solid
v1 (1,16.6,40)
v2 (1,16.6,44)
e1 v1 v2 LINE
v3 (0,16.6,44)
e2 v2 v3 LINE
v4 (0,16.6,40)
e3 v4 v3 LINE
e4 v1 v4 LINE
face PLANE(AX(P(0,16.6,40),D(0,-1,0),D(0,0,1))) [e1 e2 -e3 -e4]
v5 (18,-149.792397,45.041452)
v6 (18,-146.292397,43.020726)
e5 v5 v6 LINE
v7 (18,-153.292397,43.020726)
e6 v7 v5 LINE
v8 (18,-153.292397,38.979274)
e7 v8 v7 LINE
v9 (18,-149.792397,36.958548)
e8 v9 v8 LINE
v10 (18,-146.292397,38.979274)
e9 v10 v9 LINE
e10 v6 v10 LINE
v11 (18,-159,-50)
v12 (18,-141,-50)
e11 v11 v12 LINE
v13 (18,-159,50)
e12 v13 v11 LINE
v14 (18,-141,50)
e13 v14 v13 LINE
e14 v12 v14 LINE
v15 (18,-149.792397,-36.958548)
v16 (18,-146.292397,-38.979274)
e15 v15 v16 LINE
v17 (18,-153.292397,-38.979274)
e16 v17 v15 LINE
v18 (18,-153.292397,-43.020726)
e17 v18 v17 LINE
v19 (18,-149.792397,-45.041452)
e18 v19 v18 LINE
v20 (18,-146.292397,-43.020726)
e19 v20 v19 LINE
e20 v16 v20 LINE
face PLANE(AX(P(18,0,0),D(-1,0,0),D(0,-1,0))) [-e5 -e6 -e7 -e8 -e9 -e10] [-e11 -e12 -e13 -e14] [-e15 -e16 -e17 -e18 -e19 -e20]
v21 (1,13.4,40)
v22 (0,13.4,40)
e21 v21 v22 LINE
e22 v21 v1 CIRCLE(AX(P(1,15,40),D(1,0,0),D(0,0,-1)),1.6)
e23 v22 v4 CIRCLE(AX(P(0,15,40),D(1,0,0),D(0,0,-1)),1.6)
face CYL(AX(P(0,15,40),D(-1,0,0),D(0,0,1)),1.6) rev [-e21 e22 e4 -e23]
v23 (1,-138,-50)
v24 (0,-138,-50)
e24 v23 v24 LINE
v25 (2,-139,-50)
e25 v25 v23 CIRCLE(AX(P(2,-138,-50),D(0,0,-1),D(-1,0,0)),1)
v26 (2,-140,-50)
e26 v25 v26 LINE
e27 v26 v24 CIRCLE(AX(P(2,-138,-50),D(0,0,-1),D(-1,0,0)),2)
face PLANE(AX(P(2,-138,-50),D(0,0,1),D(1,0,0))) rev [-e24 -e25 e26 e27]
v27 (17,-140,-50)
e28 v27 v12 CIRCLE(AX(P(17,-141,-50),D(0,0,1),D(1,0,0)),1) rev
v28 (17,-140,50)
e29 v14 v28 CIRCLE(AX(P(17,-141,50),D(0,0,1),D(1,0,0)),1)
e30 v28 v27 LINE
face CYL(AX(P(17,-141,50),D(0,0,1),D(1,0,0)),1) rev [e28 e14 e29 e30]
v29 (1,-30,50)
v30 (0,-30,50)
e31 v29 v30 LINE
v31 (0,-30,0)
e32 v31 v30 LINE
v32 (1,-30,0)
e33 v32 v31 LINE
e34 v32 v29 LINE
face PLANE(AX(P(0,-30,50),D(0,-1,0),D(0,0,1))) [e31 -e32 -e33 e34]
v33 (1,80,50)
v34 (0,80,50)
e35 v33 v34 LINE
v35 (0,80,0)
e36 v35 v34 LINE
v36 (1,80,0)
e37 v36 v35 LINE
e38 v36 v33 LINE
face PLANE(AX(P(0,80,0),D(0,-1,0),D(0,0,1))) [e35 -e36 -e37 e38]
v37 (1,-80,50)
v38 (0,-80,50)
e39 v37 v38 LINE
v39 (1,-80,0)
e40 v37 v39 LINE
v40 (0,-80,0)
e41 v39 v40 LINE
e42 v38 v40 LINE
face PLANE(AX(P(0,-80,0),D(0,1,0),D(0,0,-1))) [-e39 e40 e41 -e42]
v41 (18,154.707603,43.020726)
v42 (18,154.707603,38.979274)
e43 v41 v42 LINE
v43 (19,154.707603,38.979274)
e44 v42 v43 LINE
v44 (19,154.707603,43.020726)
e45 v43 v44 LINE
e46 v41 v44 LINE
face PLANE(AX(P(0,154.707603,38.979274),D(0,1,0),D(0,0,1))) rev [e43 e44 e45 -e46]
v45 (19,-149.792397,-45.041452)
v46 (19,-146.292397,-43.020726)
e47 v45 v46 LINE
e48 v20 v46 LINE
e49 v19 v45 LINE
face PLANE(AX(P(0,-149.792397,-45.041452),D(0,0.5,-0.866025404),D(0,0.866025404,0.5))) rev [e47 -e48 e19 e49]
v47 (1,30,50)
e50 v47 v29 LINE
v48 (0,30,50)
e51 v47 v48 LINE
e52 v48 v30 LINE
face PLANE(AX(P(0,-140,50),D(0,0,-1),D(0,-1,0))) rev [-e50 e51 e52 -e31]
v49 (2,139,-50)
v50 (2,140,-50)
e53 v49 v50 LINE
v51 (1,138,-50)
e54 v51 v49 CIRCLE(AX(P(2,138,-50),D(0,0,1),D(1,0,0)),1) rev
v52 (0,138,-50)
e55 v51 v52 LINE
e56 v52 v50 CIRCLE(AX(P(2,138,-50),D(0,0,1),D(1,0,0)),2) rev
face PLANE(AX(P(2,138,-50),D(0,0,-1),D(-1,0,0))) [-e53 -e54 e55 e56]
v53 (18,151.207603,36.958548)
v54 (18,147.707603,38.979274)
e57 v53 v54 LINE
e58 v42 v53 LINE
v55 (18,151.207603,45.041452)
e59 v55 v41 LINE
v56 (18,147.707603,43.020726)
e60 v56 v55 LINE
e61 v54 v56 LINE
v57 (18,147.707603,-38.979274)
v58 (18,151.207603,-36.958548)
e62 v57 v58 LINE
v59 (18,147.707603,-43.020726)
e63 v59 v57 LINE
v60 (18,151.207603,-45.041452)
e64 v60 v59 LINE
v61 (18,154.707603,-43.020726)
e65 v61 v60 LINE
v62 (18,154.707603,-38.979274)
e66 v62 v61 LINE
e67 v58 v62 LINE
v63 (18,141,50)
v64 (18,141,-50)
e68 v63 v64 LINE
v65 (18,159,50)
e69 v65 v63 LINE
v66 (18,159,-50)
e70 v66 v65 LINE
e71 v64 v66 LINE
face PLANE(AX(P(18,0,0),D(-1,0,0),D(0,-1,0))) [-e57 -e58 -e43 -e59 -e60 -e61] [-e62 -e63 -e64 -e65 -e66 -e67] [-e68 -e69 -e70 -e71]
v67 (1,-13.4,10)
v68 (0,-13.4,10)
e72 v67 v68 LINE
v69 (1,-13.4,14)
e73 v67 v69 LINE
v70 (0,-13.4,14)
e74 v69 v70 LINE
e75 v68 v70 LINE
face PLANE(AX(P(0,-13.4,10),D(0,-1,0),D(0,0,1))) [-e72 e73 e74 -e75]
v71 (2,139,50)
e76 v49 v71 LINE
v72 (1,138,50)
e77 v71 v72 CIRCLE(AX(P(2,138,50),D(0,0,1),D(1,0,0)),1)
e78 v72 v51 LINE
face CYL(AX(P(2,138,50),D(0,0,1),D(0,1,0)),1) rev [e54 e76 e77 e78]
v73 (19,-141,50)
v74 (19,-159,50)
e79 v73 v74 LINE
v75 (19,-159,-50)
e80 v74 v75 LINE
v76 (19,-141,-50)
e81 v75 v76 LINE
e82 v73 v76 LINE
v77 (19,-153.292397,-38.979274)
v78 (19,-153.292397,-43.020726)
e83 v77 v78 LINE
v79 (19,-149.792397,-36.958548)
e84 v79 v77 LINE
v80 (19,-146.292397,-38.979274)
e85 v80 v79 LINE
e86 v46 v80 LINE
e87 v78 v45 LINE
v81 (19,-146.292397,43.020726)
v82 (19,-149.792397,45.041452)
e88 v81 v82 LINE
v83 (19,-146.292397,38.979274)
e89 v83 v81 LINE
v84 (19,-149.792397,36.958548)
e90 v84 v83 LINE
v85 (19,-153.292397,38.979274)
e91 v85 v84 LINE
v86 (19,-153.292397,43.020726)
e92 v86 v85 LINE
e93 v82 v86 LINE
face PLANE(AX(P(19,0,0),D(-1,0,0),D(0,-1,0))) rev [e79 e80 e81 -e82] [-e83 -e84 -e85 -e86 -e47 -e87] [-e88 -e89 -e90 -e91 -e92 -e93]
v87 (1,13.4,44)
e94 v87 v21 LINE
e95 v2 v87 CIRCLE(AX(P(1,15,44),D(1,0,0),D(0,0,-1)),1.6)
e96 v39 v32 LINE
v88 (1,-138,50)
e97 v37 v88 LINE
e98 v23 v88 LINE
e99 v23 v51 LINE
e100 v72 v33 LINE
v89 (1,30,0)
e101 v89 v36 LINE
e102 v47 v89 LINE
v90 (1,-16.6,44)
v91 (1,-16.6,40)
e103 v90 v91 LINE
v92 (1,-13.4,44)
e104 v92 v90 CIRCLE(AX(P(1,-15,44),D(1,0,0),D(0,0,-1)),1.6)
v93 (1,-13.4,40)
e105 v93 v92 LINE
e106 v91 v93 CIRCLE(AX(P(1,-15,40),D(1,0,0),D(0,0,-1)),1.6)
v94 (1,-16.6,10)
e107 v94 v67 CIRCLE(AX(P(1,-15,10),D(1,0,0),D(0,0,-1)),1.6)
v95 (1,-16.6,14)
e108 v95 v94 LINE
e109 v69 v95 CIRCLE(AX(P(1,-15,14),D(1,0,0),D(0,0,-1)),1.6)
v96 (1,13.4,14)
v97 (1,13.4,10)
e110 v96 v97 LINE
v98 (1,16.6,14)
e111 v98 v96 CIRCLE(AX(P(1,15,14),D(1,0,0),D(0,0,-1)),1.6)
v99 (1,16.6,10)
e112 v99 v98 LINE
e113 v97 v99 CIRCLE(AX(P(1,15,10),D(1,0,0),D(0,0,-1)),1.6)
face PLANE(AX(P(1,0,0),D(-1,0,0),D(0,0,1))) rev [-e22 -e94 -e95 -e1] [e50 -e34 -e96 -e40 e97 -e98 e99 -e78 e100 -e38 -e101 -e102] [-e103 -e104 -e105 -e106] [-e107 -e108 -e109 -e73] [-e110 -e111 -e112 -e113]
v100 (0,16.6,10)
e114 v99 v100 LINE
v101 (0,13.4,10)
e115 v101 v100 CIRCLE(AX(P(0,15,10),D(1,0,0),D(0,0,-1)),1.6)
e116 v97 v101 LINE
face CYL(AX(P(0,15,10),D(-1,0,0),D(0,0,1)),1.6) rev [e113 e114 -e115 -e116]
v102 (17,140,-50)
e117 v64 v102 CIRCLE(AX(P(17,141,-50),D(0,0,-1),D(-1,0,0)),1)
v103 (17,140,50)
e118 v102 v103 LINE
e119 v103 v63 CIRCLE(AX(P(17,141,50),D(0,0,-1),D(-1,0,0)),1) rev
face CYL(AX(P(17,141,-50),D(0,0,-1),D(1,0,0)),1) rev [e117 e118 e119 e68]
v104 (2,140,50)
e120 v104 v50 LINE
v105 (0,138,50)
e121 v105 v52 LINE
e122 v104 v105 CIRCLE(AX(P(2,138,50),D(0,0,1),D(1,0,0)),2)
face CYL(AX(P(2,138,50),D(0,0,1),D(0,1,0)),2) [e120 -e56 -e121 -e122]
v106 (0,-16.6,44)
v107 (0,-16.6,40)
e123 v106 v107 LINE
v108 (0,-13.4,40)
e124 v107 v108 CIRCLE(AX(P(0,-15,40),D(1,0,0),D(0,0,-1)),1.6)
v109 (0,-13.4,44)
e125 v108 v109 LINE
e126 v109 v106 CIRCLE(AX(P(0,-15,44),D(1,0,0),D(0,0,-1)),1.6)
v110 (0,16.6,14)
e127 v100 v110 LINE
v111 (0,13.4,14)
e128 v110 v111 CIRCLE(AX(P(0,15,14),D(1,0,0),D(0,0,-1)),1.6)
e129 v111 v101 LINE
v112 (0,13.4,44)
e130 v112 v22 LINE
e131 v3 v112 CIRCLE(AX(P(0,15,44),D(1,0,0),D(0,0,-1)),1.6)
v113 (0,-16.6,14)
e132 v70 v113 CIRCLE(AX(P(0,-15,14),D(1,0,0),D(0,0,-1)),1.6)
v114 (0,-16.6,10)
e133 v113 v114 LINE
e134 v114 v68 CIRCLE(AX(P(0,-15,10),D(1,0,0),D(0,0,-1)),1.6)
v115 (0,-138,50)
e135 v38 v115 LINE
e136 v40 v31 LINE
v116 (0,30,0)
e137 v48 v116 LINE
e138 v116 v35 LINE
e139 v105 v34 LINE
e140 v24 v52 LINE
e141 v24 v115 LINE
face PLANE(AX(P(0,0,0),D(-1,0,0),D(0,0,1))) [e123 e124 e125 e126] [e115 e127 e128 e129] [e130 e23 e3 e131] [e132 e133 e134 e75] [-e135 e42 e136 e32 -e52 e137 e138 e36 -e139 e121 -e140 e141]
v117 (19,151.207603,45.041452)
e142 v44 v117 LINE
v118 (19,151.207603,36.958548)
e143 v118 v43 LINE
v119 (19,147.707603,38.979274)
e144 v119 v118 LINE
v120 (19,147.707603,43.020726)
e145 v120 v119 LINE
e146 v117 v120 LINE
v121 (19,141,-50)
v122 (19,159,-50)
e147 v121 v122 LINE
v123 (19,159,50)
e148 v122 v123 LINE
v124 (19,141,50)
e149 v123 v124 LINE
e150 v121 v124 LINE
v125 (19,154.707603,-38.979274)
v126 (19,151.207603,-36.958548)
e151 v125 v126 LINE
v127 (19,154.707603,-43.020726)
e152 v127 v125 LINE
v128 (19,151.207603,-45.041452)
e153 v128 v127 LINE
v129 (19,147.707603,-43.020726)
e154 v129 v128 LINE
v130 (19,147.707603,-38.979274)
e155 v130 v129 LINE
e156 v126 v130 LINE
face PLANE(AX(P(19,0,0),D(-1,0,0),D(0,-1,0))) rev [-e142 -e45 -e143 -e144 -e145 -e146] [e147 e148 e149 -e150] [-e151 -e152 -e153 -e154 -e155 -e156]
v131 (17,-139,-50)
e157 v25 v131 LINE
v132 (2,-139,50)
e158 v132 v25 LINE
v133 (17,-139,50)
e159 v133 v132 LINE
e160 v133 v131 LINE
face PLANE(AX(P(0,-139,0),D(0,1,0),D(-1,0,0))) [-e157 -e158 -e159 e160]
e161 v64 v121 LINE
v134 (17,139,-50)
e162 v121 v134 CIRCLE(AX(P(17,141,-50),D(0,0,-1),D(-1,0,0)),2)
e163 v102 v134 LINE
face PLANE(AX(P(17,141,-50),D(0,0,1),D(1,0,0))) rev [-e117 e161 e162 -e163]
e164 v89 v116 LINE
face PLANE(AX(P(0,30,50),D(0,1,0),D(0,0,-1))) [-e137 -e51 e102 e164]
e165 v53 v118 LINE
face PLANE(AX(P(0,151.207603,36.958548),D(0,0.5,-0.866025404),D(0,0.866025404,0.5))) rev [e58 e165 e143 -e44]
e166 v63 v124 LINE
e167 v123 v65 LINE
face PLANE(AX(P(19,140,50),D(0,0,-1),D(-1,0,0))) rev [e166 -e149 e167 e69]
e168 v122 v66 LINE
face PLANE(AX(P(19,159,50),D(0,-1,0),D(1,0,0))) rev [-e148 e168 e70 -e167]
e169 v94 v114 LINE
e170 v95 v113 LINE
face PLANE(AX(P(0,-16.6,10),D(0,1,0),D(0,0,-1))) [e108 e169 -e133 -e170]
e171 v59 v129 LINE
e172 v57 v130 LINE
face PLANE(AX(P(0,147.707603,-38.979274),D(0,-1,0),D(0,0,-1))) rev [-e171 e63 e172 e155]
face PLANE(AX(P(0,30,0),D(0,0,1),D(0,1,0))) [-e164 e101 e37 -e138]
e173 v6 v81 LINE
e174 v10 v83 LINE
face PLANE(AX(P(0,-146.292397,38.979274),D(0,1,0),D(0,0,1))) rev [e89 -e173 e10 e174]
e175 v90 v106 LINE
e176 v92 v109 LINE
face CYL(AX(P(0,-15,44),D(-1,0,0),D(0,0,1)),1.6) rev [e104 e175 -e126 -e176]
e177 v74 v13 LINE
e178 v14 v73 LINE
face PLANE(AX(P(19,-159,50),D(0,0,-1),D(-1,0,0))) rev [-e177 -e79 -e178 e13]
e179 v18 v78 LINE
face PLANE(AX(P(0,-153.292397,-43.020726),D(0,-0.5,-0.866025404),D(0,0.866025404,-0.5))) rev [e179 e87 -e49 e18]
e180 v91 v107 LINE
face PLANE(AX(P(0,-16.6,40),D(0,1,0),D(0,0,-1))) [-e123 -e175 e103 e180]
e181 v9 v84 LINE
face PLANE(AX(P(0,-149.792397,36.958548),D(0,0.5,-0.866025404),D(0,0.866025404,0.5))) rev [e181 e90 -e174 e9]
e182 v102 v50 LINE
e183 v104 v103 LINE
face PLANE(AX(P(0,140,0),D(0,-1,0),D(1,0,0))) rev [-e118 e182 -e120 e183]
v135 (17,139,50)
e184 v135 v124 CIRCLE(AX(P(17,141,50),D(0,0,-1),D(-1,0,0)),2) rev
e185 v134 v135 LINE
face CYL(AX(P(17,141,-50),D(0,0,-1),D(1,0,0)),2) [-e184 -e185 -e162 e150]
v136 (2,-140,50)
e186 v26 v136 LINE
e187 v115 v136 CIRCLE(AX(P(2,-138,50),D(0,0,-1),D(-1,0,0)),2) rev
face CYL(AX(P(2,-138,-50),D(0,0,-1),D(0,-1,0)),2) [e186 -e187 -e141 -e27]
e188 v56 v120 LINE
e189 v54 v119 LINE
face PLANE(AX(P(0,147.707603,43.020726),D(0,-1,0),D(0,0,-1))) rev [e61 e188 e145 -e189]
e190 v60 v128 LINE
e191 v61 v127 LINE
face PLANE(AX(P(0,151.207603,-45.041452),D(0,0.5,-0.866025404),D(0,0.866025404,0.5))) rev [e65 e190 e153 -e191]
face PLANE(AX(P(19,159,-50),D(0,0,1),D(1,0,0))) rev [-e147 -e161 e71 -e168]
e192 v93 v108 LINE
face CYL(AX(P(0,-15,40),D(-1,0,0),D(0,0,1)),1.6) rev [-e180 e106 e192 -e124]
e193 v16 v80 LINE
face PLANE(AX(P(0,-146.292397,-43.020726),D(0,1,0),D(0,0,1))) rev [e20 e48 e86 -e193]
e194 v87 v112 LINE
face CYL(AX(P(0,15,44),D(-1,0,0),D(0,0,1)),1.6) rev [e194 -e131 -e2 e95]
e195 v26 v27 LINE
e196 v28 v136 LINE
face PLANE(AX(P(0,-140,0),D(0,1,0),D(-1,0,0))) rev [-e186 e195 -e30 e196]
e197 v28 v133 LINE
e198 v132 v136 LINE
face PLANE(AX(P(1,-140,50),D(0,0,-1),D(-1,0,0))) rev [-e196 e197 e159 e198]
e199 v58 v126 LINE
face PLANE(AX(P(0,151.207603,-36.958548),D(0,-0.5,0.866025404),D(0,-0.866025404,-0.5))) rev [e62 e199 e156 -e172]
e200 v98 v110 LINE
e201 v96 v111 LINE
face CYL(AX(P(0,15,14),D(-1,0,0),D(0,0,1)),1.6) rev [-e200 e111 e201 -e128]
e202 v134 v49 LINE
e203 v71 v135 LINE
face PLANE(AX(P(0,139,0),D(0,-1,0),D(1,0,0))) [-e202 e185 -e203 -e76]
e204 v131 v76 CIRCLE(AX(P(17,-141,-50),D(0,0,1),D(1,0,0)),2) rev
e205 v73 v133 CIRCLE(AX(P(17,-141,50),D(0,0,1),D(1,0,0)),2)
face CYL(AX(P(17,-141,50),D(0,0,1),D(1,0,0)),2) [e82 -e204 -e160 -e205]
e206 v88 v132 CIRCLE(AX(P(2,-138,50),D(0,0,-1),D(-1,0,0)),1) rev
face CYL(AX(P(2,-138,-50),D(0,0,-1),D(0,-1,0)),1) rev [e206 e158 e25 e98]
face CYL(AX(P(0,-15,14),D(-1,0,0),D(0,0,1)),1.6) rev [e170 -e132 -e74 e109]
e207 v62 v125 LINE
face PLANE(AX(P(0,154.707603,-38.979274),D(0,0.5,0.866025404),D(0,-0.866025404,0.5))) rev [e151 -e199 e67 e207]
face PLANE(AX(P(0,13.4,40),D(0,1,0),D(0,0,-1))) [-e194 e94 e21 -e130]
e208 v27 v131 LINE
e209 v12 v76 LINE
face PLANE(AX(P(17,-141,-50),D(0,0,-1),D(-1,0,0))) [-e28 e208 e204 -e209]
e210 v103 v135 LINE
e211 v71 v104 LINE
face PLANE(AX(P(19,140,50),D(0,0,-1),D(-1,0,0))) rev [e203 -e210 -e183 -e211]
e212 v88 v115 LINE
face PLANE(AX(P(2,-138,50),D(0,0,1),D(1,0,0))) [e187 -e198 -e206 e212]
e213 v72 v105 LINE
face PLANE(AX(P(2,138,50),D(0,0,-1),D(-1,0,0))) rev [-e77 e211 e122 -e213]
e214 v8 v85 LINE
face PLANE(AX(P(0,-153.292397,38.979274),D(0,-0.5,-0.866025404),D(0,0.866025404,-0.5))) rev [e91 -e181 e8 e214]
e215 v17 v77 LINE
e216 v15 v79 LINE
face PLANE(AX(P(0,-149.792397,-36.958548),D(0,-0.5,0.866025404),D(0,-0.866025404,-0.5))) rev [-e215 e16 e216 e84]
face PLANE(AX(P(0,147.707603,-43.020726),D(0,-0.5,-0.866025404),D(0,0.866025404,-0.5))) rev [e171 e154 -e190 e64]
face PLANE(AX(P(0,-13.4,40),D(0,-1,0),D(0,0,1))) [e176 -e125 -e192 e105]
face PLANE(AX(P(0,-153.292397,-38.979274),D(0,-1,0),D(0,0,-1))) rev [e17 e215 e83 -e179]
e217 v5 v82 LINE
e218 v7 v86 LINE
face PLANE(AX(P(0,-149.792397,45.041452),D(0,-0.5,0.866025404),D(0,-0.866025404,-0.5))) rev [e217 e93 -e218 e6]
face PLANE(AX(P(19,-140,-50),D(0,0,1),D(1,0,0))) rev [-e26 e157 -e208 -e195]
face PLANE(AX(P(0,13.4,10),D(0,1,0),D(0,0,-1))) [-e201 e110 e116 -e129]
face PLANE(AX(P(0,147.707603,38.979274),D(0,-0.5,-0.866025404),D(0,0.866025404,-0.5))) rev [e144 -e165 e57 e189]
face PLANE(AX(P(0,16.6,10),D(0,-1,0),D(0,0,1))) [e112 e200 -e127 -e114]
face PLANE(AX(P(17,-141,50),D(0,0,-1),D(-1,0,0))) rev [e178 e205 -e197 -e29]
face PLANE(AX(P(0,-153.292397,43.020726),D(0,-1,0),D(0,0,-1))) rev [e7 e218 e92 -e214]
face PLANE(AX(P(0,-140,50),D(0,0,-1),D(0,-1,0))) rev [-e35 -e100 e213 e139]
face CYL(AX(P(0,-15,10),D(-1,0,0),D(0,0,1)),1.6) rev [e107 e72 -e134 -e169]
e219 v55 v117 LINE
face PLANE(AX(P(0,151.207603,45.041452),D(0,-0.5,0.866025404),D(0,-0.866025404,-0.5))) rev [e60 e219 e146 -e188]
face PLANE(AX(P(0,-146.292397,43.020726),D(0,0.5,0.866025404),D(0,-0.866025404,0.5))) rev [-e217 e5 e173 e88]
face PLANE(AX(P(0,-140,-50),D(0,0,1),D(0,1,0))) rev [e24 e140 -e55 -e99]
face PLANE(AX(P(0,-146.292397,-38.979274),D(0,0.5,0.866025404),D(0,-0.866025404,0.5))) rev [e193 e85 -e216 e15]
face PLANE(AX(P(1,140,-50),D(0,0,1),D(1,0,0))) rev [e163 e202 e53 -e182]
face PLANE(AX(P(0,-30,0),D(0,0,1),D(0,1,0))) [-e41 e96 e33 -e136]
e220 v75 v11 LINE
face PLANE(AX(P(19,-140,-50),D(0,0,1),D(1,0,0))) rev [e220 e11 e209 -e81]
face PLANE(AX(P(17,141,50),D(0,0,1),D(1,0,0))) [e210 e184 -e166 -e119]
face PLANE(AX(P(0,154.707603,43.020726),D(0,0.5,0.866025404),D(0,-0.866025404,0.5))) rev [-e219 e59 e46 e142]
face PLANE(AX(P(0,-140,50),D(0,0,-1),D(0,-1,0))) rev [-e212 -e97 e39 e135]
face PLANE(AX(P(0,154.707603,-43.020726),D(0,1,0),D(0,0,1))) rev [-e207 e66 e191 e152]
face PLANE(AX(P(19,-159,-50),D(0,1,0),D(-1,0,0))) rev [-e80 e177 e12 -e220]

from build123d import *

# Parameters (mm, degrees)
SKETCH1_W                      = 280
SKETCH1_H                      = 100
BOSS_EXTRUDE1_DEPTH            = 1
SKETCH2_W                      = 50
SKETCH2_H                      = 50
CUT_EXTRUDE3_DEPTH             = 149.664050799
CUT_EXTRUDE4_DEPTH             = 149.664050799
EDGE_FLANGE1_STRIP_W           = 6
EDGE_FLANGE1_STRIP_H           = 1
EDGE_FLANGE1_STRIP_CUT_DEPTH   = 100
EDGE_FLANGE1_STRIP_2_W         = 6
EDGE_FLANGE1_STRIP_2_H         = 1
EDGE_FLANGE1_STRIP_CUT_2_DEPTH = 100
EDGE_FLANGE1_DEPTH             = 100
EDGE_FLANGE1_BEND_DEPTH        = 100
EDGE_FLANGE2_STRIP_W           = 6
EDGE_FLANGE2_STRIP_H           = 1
EDGE_FLANGE2_STRIP_CUT_DEPTH   = 100
EDGE_FLANGE2_STRIP_2_W         = 6
EDGE_FLANGE2_STRIP_2_H         = 1
EDGE_FLANGE2_STRIP_CUT_2_DEPTH = 100
EDGE_FLANGE2_DEPTH             = 100
EDGE_FLANGE2_BEND_DEPTH        = 100
CUT_EXTRUDE5_DEPTH             = 168.755774863


# Sheet-metal steps are written as plain solids
with BuildPart() as part:
    # Sketch1 → Boss-Extrude1 (new body)
    with BuildSketch(Plane.YZ):
        Rectangle(SKETCH1_W, SKETCH1_H)
    extrude(amount=BOSS_EXTRUDE1_DEPTH)

    # Sketch2 → Cut-Extrude3 (cut, through all)
    with BuildSketch(Plane.YZ.offset(1)):
        with Locations((-55, 25)):
            Rectangle(SKETCH2_W, SKETCH2_H)
        with Locations((55, 25)):
            Rectangle(SKETCH2_W, SKETCH2_H)
    extrude(amount=-CUT_EXTRUDE3_DEPTH, mode=Mode.SUBTRACT)

    # Sketch3 → Cut-Extrude4 (cut, through all)
    with BuildSketch(Plane.YZ.offset(1)):
        with BuildLine():
            Line((-16.6, 40), (-16.6, 44))
            ThreePointArc((-16.6, 44), (-15, 45.6), (-13.4, 44))
            Line((-13.4, 44), (-13.4, 40))
            ThreePointArc((-13.4, 40), (-15, 38.4), (-16.6, 40))
        make_face()
        with BuildLine():
            Line((13.4, 40), (13.4, 44))
            ThreePointArc((13.4, 44), (15, 45.6), (16.6, 44))
            Line((16.6, 44), (16.6, 40))
            ThreePointArc((16.6, 40), (15, 38.4), (13.4, 40))
        make_face()
        with BuildLine():
            Line((13.4, 10), (13.4, 14))
            ThreePointArc((13.4, 14), (15, 15.6), (16.6, 14))
            Line((16.6, 14), (16.6, 10))
            ThreePointArc((16.6, 10), (15, 8.4), (13.4, 10))
        make_face()
        with BuildLine():
            Line((-16.6, 10), (-16.6, 14))
            ThreePointArc((-16.6, 14), (-15, 15.6), (-13.4, 14))
            Line((-13.4, 14), (-13.4, 10))
            ThreePointArc((-13.4, 10), (-15, 8.4), (-16.6, 10))
        make_face()
    extrude(amount=-CUT_EXTRUDE4_DEPTH, mode=Mode.SUBTRACT)

    # Edge-Flange1 strip (across the edge) → Edge-Flange1 strip cut (cut)
    with BuildSketch(Plane(origin=(1, 140, -50), x_dir=(0, -1, 0), z_dir=(0, 0, 1))):
        with Locations((-1, -0.5)):
            Rectangle(EDGE_FLANGE1_STRIP_W, EDGE_FLANGE1_STRIP_H)
    extrude(amount=EDGE_FLANGE1_STRIP_CUT_DEPTH, mode=Mode.SUBTRACT)

    # Edge-Flange1 strip 2 (across the edge) → Edge-Flange1 strip cut 2 (cut)
    with BuildSketch(Plane(origin=(1, -140, 50), x_dir=(0, 1, 0), z_dir=(0, 0, -1))):
        with Locations((-1, -0.5)):
            Rectangle(EDGE_FLANGE1_STRIP_2_W, EDGE_FLANGE1_STRIP_2_H)
    extrude(amount=EDGE_FLANGE1_STRIP_CUT_2_DEPTH, mode=Mode.SUBTRACT)

    # Edge-Flange1 section (across the edge) → Edge-Flange1 (add)
    with BuildSketch(Plane(origin=(1, 140, -50), x_dir=(0, -1, 0), z_dir=(0, 0, 1))):
        with BuildLine():
            Line((0, 1), (0, 18))
            Line((0, 18), (1, 18))
            Line((1, 18), (1, 1))
            ThreePointArc((1, 1), (1.292893219, 0.292893219), (2, 0))
            Line((2, 0), (2, -1))
            ThreePointArc((2, -1), (0.585786438, -0.414213562), (0, 1))
        make_face()
    extrude(amount=EDGE_FLANGE1_DEPTH)

    # Edge-Flange1 section 2 (across the edge) → Edge-Flange1 bend (add)
    with BuildSketch(Plane(origin=(1, -140, 50), x_dir=(0, 1, 0), z_dir=(0, 0, -1))):
        with BuildLine():
            Line((0, 1), (0, 18))
            Line((0, 18), (1, 18))
            Line((1, 18), (1, 1))
            ThreePointArc((1, 1), (1.292893219, 0.292893219), (2, 0))
            Line((2, 0), (2, -1))
            ThreePointArc((2, -1), (0.585786438, -0.414213562), (0, 1))
        make_face()
    extrude(amount=EDGE_FLANGE1_BEND_DEPTH)

    # Edge-Flange2 strip (across the edge) → Edge-Flange2 strip cut (cut)
    with BuildSketch(Plane(origin=(19, 140, 50), x_dir=(-1, 0, 0), z_dir=(0, 0, -1))):
        with Locations((-1, -0.5)):
            Rectangle(EDGE_FLANGE2_STRIP_W, EDGE_FLANGE2_STRIP_H)
    extrude(amount=EDGE_FLANGE2_STRIP_CUT_DEPTH, mode=Mode.SUBTRACT)

    # Edge-Flange2 strip 2 (across the edge) → Edge-Flange2 strip cut 2 (cut)
    with BuildSketch(Plane(origin=(19, -140, -50), x_dir=(-1, 0, 0), z_dir=(0, 0, 1))):
        with Locations((-1, -0.5)):
            Rectangle(EDGE_FLANGE2_STRIP_2_W, EDGE_FLANGE2_STRIP_2_H)
    extrude(amount=EDGE_FLANGE2_STRIP_CUT_2_DEPTH, mode=Mode.SUBTRACT)

    # Edge-Flange2 section (across the edge) → Edge-Flange2 (add)
    with BuildSketch(Plane(origin=(19, 140, 50), x_dir=(-1, 0, 0), z_dir=(0, 0, -1))):
        with BuildLine():
            Line((0, 1), (0, 19))
            Line((0, 19), (1, 19))
            Line((1, 19), (1, 1))
            ThreePointArc((1, 1), (1.292893219, 0.292893219), (2, 0))
            Line((2, 0), (2, -1))
            ThreePointArc((2, -1), (0.585786438, -0.414213562), (0, 1))
        make_face()
    extrude(amount=EDGE_FLANGE2_DEPTH)

    # Edge-Flange2 section 2 (across the edge) → Edge-Flange2 bend (add)
    with BuildSketch(Plane(origin=(19, -140, -50), x_dir=(-1, 0, 0), z_dir=(0, 0, 1))):
        with BuildLine():
            Line((0, 1), (0, 19))
            Line((0, 19), (1, 19))
            Line((1, 19), (1, 1))
            ThreePointArc((1, 1), (1.292893219, 0.292893219), (2, 0))
            Line((2, 0), (2, -1))
            ThreePointArc((2, -1), (0.585786438, -0.414213562), (0, 1))
        make_face()
    extrude(amount=EDGE_FLANGE2_BEND_DEPTH)

    # Sketch26 → Cut-Extrude5 (cut, through all)
    with BuildSketch(Plane.YZ.offset(19)):
        Polygon((-149.792397295, 45.041451884), (-153.292397295, 43.020725942), (-153.292397295, 38.979274058), (-149.792397295, 36.958548116), (-146.292397295, 38.979274058), (-146.292397295, 43.020725942), align=None)
        Polygon((-149.792397295, -36.958548116), (-153.292397295, -38.979274058), (-153.292397295, -43.020725942), (-149.792397295, -45.041451884), (-146.292397295, -43.020725942), (-146.292397295, -38.979274058), align=None)
        Polygon((147.707602705, -43.020725942), (151.207602705, -45.041451884), (154.707602705, -43.020725942), (154.707602705, -38.979274058), (151.207602705, -36.958548116), (147.707602705, -38.979274058), align=None)
        Polygon((147.707602705, 38.979274058), (151.207602705, 36.958548116), (154.707602705, 38.979274058), (154.707602705, 43.020725942), (151.207602705, 45.041451884), (147.707602705, 43.020725942), align=None)
    extrude(amount=-CUT_EXTRUDE5_DEPTH, mode=Mode.SUBTRACT)


solid = part.part
